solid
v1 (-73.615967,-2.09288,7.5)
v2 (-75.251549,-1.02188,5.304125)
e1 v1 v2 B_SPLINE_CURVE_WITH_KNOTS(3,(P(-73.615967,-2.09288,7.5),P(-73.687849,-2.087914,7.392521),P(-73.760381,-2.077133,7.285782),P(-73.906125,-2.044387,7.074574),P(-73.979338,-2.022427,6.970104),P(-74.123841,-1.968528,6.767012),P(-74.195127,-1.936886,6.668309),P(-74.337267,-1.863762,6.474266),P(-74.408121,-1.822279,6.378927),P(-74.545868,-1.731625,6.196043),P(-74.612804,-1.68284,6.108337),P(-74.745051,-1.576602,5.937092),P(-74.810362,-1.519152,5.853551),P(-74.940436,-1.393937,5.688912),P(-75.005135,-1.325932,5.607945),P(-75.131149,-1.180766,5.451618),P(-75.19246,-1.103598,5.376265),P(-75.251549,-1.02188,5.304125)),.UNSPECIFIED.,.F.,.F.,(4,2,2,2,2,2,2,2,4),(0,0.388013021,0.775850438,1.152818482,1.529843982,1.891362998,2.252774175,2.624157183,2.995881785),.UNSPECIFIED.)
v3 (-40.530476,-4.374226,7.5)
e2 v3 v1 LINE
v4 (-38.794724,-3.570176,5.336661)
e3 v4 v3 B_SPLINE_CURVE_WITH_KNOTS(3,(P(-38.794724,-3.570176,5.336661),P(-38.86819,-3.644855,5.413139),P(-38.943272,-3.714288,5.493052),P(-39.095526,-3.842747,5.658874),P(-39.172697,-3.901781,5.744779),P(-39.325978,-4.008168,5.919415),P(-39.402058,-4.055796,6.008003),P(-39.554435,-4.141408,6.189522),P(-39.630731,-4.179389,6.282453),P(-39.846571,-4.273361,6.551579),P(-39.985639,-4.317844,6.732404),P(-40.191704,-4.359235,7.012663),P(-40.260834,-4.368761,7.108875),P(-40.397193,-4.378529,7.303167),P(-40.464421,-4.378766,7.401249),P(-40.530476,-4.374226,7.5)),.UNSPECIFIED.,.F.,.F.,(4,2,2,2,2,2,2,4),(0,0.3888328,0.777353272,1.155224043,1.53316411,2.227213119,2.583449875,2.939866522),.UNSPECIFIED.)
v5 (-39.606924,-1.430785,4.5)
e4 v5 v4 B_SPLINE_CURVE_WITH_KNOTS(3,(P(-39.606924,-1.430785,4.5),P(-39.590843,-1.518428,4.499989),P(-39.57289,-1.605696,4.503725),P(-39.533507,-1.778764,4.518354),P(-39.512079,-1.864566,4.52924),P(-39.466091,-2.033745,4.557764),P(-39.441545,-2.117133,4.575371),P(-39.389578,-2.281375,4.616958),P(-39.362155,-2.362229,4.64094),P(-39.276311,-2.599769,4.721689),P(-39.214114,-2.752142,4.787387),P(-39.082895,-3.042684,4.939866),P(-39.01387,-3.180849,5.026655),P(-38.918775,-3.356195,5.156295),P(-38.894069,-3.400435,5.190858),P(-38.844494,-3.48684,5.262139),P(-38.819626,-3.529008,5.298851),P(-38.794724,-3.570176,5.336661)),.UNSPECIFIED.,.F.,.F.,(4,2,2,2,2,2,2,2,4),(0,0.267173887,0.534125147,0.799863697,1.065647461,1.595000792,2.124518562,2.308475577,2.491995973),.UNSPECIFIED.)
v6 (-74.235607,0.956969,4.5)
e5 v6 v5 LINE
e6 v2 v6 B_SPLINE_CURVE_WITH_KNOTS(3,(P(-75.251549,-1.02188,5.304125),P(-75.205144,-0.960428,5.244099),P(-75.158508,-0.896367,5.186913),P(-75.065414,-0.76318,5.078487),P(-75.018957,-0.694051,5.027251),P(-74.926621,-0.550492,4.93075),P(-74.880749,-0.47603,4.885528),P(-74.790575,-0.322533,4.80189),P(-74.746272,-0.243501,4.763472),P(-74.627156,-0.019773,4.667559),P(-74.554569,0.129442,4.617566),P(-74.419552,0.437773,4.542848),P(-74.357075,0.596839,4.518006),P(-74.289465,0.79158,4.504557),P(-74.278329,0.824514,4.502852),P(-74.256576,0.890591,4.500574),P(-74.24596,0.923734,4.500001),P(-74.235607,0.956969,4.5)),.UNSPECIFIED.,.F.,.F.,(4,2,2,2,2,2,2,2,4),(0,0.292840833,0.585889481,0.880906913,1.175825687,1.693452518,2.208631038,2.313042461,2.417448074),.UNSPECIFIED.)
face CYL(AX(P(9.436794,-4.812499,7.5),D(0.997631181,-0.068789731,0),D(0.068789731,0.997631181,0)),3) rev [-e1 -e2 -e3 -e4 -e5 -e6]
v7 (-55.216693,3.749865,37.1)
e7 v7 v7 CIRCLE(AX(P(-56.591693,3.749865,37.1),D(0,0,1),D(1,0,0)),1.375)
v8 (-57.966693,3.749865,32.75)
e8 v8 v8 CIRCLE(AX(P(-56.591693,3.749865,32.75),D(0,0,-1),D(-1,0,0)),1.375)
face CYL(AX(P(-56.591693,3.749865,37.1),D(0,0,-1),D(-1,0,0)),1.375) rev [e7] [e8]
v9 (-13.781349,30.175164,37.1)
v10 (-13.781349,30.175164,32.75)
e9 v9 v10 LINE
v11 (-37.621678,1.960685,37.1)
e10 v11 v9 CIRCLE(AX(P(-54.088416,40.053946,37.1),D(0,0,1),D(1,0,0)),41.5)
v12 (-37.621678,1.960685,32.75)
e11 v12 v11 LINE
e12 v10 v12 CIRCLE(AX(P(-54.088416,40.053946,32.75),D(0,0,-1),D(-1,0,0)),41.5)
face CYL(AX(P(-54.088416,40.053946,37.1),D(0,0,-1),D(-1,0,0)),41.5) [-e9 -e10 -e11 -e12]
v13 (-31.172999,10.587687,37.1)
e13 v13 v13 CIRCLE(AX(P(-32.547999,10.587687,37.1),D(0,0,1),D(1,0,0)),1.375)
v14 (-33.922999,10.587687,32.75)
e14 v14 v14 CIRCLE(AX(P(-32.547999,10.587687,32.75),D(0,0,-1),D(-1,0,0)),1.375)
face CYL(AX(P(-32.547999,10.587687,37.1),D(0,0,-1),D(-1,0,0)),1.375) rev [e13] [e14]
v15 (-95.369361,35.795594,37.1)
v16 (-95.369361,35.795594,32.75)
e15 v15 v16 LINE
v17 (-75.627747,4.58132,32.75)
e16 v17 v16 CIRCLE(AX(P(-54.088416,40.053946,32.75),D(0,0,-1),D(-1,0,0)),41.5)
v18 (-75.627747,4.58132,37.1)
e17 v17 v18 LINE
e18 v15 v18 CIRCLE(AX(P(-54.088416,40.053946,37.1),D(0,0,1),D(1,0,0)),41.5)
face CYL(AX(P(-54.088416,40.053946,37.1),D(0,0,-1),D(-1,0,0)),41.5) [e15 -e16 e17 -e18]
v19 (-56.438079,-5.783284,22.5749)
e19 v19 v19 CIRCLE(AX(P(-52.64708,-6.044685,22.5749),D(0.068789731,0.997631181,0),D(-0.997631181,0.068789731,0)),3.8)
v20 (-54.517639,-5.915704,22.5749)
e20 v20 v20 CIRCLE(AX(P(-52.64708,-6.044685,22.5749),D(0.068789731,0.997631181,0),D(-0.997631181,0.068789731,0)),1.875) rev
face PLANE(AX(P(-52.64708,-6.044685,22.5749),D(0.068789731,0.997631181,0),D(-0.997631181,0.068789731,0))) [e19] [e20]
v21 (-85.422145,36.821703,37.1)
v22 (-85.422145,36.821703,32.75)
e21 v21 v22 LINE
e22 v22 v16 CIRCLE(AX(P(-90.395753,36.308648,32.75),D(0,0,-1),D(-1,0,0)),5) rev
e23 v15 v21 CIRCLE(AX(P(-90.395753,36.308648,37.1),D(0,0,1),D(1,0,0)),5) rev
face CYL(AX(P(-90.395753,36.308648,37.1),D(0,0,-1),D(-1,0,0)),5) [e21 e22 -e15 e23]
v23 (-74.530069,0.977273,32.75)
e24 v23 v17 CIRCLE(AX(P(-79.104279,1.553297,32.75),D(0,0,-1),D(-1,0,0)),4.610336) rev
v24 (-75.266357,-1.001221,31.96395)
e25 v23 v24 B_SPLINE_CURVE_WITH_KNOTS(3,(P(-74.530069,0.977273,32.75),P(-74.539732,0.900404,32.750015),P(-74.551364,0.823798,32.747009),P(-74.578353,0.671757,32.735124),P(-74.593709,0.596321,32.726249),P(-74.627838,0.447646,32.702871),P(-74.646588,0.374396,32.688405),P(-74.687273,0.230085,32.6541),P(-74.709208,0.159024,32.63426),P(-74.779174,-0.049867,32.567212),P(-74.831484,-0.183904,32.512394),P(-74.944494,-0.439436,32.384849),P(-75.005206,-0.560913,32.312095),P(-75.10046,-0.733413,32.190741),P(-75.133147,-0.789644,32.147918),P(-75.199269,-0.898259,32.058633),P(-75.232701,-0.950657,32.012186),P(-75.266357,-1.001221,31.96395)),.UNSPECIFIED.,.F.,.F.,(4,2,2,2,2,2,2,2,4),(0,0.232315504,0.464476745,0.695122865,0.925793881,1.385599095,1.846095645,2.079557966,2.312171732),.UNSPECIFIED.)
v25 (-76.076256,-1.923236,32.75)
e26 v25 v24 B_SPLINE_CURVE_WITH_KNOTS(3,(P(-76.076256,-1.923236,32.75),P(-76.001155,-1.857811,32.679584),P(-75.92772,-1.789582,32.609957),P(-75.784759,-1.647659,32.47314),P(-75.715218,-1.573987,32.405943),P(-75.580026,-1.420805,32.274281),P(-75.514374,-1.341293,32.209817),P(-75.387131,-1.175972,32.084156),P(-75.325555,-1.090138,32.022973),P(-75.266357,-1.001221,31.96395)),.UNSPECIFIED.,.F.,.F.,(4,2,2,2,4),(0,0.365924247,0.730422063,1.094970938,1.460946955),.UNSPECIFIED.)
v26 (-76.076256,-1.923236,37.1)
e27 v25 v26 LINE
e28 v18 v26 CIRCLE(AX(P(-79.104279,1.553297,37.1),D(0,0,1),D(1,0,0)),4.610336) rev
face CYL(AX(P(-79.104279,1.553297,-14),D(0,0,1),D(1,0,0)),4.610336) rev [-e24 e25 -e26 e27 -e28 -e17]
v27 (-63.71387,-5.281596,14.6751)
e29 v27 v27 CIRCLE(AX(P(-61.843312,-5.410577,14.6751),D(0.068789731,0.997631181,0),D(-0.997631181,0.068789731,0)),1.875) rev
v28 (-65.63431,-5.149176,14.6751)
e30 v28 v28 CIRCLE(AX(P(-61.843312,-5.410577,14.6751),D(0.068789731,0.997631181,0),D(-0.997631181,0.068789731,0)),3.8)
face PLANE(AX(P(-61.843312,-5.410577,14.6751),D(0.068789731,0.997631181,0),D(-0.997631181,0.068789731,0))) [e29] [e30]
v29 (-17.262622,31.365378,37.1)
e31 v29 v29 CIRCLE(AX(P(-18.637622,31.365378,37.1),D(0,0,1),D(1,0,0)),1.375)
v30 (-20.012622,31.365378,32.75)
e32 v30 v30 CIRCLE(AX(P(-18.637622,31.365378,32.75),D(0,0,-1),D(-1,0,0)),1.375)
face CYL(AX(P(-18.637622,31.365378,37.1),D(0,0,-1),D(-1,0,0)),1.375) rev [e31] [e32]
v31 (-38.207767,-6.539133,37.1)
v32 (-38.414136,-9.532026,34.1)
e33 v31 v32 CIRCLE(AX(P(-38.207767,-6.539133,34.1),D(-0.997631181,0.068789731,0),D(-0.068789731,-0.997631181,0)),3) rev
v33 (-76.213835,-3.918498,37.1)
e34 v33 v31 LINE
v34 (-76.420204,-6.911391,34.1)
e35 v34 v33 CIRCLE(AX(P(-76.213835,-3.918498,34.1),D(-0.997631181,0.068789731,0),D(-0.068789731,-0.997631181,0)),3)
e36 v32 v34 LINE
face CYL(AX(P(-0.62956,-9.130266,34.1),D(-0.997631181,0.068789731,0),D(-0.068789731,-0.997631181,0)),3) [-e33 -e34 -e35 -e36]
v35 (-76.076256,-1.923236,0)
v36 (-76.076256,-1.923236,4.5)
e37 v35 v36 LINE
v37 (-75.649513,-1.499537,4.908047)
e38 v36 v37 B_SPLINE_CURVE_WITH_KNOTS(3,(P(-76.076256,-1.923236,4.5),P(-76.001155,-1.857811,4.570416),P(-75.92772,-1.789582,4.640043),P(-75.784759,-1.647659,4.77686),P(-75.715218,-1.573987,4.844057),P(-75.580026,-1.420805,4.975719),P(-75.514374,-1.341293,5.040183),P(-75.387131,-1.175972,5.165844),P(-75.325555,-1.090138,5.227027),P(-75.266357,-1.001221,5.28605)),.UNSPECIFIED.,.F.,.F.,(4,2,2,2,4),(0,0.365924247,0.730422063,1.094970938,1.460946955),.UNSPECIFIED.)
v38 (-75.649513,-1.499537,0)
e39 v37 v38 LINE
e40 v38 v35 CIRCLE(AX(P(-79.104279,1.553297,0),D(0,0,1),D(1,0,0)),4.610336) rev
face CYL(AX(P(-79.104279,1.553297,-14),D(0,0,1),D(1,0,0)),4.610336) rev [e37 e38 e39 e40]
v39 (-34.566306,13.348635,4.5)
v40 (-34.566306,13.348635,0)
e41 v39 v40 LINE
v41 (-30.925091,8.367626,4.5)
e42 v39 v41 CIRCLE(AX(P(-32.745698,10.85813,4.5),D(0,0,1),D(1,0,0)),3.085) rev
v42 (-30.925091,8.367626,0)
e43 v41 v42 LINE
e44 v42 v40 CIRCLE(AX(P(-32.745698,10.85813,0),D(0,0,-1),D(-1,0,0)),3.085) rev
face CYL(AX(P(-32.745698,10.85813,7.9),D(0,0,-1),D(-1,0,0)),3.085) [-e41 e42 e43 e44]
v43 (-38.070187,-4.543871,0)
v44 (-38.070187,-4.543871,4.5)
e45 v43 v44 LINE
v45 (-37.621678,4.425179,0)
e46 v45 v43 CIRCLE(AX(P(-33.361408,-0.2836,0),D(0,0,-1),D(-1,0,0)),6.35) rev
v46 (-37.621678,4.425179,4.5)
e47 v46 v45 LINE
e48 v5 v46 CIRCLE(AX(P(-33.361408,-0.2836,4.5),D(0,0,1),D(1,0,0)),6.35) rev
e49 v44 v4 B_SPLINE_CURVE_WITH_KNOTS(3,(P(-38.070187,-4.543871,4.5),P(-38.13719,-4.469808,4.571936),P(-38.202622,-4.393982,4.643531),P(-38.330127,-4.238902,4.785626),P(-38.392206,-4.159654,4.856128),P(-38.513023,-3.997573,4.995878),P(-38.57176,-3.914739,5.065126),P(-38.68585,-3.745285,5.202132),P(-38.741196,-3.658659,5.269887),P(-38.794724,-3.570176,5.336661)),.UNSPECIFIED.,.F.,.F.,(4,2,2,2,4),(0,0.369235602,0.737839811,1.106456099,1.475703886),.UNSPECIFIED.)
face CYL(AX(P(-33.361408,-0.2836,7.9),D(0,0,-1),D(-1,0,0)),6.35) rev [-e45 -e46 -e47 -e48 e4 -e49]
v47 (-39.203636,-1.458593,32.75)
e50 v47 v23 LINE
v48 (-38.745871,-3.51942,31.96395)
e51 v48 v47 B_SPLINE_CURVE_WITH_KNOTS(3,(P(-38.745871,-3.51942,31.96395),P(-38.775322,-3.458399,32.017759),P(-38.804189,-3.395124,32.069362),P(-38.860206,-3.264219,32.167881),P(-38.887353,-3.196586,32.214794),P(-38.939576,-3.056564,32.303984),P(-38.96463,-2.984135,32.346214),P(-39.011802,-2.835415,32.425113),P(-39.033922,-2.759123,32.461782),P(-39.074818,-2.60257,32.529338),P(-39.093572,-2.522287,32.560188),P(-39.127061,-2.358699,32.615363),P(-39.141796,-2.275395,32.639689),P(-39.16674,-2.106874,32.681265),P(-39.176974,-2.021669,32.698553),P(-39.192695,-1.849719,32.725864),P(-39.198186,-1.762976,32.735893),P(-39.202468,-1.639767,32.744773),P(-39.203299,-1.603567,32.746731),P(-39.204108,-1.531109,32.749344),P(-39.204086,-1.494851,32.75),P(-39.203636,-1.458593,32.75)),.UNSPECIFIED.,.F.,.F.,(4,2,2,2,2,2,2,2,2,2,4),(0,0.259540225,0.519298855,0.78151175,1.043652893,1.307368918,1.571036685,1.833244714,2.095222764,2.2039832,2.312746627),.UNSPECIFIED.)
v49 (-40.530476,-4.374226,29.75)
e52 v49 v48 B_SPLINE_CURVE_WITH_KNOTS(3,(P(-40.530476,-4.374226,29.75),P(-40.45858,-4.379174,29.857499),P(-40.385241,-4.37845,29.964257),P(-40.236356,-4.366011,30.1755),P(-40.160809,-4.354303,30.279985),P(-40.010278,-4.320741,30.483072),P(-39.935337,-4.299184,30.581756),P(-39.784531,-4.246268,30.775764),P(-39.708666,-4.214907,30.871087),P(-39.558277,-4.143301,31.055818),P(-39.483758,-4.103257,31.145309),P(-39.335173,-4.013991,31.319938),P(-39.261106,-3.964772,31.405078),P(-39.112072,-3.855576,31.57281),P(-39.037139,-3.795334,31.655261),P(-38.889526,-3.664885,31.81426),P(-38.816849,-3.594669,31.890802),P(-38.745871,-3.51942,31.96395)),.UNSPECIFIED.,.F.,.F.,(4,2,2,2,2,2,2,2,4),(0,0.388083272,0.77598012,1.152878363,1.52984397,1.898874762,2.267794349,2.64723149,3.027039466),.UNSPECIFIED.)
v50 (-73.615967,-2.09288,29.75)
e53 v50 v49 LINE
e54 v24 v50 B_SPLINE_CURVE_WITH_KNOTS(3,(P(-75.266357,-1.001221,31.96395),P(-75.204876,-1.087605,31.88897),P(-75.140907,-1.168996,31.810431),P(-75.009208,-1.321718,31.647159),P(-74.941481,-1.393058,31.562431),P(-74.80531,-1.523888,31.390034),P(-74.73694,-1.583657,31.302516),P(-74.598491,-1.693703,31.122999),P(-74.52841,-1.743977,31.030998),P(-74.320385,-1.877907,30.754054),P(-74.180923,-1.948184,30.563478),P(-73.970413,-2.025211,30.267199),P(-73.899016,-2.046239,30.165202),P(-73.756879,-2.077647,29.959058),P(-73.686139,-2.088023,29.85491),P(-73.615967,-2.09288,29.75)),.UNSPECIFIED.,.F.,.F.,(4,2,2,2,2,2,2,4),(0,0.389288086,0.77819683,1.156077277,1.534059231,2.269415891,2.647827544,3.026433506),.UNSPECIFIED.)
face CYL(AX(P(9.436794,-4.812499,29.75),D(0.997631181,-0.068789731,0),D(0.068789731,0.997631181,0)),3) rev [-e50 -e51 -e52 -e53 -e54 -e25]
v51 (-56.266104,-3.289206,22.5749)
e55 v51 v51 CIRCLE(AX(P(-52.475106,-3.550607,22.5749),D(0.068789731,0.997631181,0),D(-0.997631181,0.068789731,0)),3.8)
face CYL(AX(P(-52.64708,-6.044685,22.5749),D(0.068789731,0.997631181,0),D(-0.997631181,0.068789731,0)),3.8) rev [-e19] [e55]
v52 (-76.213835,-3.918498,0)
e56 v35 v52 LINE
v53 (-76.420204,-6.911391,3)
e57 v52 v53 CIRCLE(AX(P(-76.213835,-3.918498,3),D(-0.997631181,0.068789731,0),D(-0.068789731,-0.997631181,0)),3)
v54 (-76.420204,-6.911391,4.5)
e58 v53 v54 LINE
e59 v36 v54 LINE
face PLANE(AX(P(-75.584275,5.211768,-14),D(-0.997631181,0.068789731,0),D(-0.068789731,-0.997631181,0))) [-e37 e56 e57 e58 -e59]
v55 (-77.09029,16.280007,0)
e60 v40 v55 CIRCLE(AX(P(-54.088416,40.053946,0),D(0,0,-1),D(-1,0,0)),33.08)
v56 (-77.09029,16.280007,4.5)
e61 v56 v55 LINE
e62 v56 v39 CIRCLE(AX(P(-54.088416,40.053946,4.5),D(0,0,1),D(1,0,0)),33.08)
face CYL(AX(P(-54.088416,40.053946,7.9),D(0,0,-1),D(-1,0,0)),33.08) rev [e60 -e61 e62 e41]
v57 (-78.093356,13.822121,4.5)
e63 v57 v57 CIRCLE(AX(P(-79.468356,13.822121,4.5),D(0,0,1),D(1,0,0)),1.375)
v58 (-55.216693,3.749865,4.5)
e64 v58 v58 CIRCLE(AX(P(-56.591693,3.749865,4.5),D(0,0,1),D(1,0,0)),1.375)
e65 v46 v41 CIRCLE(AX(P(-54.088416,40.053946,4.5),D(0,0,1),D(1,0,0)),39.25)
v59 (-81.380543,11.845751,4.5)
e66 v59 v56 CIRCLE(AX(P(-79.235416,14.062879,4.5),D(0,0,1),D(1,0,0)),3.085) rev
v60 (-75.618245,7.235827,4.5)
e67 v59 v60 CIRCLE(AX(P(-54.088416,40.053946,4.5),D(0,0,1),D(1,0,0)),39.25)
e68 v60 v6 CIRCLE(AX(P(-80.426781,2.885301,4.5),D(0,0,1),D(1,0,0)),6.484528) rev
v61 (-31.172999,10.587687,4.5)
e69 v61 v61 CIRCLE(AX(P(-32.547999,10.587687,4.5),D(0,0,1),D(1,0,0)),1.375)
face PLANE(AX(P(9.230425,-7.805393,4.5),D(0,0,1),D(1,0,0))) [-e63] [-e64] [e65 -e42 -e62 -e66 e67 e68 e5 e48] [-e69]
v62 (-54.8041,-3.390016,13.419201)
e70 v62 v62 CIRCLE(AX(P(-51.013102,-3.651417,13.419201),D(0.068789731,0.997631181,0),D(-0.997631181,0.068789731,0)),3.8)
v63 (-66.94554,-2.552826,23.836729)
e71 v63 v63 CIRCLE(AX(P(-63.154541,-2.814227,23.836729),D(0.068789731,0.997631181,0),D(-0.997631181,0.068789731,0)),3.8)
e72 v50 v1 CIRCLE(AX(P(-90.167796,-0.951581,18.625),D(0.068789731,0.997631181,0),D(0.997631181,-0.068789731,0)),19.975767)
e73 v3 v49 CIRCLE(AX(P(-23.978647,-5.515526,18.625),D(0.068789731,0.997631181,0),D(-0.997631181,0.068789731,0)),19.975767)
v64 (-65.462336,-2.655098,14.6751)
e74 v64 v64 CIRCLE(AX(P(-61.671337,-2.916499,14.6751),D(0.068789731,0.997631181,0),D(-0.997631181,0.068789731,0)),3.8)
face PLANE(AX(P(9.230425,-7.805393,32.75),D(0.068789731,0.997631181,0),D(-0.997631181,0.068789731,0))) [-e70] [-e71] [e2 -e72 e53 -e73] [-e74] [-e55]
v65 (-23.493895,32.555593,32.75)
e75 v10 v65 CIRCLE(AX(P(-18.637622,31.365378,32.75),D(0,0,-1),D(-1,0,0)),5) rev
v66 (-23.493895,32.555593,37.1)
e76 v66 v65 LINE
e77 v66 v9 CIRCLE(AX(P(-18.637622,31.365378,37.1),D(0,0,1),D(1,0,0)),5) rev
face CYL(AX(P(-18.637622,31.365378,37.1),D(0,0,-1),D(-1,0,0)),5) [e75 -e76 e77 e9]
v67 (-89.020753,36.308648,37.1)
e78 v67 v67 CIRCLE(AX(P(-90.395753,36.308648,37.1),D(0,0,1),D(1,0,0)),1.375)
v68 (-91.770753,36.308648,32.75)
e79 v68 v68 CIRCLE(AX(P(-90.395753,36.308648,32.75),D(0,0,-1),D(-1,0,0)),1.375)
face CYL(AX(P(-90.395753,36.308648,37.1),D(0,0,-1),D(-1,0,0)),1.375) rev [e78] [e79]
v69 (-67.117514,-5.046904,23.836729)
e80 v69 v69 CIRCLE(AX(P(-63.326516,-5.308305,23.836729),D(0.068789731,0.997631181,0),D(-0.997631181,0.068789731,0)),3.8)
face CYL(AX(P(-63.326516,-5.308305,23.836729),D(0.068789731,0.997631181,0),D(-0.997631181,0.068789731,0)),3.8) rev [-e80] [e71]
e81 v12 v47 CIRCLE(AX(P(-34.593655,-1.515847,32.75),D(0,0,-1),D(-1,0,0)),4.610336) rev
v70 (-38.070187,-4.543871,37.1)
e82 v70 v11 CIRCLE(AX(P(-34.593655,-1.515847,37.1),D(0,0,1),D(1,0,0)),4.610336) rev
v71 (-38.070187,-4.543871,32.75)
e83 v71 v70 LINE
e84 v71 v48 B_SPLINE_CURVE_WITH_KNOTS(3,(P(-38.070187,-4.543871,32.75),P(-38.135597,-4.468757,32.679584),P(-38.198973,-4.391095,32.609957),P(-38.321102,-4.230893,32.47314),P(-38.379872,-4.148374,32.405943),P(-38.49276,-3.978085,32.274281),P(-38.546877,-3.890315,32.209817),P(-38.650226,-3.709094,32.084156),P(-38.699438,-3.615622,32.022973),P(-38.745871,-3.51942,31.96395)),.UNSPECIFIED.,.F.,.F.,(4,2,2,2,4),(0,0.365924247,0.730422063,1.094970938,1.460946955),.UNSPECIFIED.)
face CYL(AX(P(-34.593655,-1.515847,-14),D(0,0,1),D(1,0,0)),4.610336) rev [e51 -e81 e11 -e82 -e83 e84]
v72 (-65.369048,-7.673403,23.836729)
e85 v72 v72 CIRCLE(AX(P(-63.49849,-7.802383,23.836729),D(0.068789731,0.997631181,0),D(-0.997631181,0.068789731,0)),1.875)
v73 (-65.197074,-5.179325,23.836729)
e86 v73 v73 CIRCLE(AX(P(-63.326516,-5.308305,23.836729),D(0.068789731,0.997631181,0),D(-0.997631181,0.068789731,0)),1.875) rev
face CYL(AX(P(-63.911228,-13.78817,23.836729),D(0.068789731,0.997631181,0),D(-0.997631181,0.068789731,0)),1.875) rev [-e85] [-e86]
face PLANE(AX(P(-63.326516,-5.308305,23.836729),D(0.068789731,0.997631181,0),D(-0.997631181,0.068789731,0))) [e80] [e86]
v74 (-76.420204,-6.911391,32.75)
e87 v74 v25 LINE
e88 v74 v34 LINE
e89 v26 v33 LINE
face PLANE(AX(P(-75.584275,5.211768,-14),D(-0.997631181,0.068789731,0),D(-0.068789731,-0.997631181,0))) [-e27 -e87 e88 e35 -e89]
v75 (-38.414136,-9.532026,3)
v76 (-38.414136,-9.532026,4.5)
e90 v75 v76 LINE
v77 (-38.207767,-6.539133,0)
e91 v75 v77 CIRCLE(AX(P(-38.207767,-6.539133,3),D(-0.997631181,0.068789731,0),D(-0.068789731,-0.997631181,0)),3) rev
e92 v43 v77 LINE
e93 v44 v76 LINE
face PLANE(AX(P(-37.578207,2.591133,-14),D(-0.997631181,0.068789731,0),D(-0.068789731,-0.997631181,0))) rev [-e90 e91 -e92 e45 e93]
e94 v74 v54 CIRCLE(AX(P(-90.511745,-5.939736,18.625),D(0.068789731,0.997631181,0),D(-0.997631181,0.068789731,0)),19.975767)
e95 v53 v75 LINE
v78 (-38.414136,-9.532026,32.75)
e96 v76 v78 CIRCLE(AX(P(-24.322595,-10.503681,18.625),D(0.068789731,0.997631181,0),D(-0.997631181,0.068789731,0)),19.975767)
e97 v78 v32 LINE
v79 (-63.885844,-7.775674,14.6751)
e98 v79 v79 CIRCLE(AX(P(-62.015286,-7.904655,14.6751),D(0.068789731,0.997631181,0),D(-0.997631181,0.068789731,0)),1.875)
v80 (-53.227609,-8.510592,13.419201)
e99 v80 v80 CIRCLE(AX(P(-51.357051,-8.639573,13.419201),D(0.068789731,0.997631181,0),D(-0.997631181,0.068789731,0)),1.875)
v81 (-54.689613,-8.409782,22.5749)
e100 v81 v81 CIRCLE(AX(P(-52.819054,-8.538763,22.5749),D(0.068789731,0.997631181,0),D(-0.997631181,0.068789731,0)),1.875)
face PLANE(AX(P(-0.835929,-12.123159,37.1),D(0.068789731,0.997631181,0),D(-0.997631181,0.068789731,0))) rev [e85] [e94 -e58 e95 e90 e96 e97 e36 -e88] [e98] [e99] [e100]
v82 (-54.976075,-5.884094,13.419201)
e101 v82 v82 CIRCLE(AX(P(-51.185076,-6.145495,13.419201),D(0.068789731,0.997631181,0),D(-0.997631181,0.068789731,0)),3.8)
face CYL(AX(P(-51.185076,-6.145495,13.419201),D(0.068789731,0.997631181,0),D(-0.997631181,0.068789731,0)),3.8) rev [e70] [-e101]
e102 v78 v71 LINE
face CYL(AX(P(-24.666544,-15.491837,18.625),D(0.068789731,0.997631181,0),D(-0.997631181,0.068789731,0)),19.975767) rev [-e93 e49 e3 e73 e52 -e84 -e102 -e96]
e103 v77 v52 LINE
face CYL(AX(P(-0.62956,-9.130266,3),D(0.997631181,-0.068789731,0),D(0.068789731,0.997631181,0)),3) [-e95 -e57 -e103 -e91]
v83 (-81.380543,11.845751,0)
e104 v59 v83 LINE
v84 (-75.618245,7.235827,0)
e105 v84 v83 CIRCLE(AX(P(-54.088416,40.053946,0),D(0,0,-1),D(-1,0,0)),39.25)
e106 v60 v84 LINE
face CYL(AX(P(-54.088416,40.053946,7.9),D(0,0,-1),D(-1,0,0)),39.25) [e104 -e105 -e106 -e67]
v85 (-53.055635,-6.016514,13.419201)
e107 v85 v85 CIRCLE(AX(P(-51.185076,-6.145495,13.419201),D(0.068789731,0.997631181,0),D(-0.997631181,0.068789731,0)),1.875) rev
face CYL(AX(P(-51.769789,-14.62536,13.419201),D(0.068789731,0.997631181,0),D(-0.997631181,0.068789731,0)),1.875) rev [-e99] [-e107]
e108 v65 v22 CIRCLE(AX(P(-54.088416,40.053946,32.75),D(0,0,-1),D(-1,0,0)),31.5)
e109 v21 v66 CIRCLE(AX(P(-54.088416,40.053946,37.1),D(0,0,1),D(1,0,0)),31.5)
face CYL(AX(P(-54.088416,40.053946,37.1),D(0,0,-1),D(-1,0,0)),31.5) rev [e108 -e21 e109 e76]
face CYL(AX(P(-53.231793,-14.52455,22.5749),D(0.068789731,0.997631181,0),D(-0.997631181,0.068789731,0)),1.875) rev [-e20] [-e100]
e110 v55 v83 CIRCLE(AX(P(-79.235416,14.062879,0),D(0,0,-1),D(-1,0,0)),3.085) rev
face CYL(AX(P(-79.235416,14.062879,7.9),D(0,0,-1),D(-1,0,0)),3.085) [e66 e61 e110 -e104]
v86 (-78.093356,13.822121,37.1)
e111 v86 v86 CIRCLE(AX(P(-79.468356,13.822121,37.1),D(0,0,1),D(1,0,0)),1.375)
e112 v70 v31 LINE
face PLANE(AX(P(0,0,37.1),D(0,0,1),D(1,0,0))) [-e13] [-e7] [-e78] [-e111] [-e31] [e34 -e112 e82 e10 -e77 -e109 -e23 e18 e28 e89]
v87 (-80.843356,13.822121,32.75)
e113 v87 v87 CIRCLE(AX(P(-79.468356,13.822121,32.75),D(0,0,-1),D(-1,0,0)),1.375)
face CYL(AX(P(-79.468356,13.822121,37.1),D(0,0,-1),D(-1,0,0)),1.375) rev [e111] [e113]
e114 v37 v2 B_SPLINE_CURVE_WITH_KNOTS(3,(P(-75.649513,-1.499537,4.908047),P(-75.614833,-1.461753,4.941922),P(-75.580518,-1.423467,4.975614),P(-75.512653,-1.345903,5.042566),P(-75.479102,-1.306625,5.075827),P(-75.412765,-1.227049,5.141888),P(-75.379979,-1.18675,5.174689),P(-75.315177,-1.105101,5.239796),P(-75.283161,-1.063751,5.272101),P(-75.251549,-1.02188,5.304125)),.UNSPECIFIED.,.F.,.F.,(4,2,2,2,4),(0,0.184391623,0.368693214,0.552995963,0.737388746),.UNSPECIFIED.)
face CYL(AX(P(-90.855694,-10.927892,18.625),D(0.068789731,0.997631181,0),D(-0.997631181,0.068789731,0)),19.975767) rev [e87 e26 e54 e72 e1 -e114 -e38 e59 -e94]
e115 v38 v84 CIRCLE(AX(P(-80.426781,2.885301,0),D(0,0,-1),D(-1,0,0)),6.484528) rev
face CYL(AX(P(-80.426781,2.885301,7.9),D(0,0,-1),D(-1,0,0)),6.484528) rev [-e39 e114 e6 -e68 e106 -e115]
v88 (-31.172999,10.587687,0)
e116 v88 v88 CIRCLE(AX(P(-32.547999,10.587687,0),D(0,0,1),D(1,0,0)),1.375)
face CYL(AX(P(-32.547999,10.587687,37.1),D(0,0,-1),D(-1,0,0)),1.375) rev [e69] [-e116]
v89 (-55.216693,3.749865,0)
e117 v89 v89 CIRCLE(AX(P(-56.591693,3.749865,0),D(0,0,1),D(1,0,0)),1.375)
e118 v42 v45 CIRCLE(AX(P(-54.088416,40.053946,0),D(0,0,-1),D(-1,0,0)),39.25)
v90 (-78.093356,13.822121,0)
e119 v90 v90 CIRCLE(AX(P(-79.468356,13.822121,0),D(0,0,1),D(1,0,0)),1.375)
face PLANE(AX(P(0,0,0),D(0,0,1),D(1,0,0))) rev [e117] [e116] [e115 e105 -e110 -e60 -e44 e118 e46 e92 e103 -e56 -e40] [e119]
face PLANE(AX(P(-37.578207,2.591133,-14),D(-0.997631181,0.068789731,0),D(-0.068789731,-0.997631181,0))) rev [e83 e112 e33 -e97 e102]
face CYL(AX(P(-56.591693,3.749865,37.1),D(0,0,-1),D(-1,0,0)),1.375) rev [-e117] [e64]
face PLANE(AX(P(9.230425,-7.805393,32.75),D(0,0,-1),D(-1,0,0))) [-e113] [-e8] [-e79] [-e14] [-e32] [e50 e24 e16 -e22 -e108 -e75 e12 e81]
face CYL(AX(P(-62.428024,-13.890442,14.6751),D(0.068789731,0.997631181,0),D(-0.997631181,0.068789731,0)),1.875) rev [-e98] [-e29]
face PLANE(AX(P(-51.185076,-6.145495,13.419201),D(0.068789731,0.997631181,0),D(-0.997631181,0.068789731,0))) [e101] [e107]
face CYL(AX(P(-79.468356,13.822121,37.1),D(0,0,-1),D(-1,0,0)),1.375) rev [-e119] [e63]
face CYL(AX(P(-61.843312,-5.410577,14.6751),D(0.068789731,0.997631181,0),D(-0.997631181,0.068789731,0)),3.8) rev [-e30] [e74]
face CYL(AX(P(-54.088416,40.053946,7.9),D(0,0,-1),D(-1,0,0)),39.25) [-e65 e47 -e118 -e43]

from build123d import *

# Parameters (mm, degrees)
EXTRUDE_2_DEPTH          = 37.1
SKETCH_2_R               = 1.375
CUT_EXTRUDE_2_DEPTH      = 37.1
CUT_EXTRUDE_3_DEPTH      = 43
CUT_EXTRUDE_3_DEPTH_BACK = 66.1
SKETCH_7_W               = 28.25
SKETCH_7_H               = 55.645233233
CUT_EXTRUDE_4_DEPTH      = 20.1
CUT_EXTRUDE_START        = -51.1
CUT_EXTRUDE_5_DEPTH      = 51.1
SKETCH_11_R              = 1.875
CUT_EXTRUDE_11_DEPTH     = 11
SKETCH_14_R              = 3.8
CUT_EXTRUDE_12_DEPTH     = 2.5
CUT_EXTRUDE_13_DEPTH     = 10
CUT_EXTRUDE_START_2      = -4.5
CUT_EXTRUDE_16_DEPTH     = 4.5
FILLET_1_R               = 3
FILLET_2_R               = 3
FILLET_3_R               = 3
FILLET_4_R               = 3


# Read off the part's stored shape, not the designer's step: 切除-拉伸16
with BuildPart() as part:
    # 草图1 → 凸台-拉伸2 (new body)
    with BuildSketch(Plane.XY):
        with BuildLine():
            Line((-79.849997265, 7.517951971), (-80.824006782, -6.607735752))
            Line((-80.824006782, -6.607735752), (-34.011664697, -9.835590396))
            Line((-34.011664697, -9.835590396), (-33.037718089, 4.289184974))
            ThreePointArc((-33.037718089, 4.289184974), (-31.289416401, 5.37750396), (-29.597256671, 6.551212806))
            ThreePointArc((-29.597256671, 6.551212806), (-28.511524827, 13.53842873), (-35.49874075, 14.624160574))
            ThreePointArc((-35.49874075, 14.624160574), (-56.254713351, 8.628523944), (-75.991651506, 17.415521695))
            ThreePointArc((-75.991651506, 17.415521695), (-83.061756308, 17.298825117), (-82.94505973, 10.228720316))
            ThreePointArc((-82.94505973, 10.228720316), (-81.431142485, 8.834956844), (-79.849997265, 7.517951971))
        make_face()
        with BuildLine():
            ThreePointArc((-35.49874075, 14.624160574), (-28.511524827, 13.53842873), (-29.597256671, 6.551212806))
            ThreePointArc((-29.597256671, 6.551212806), (-19.60326972, 16.966618055), (-13.781348513, 30.175163589))
            ThreePointArc((-13.781348513, 30.175163589), (-17.447406903, 36.221651485), (-23.493894799, 32.555593096))
            ThreePointArc((-23.493894799, 32.555593096), (-27.912943426, 22.529829618), (-35.49874075, 14.624160574))
        make_face()
        with BuildLine():
            ThreePointArc((-95.369360777, 35.795593613), (-91.41450046, 21.915219816), (-82.94505973, 10.228720316))
            ThreePointArc((-82.94505973, 10.228720316), (-83.061756308, 17.298825117), (-75.991651506, 17.415521695))
            ThreePointArc((-75.991651506, 17.415521695), (-82.420263145, 26.28599722), (-85.422145072, 36.821702632))
            ThreePointArc((-85.422145072, 36.821702632), (-90.908807434, 41.282255975), (-95.369360777, 35.795593613))
        make_face()
    extrude(amount=EXTRUDE_2_DEPTH)

    # 草图2 → 切除-拉伸2 (cut)
    with BuildSketch(Plane.XY):
        with Locations((-90.395752924, 36.308648122)):
            Circle(SKETCH_2_R)
        with Locations((-79.468355618, 13.822121005)):
            Circle(SKETCH_2_R)
        with Locations((-56.591693385, 3.749865202)):
            Circle(SKETCH_2_R)
        with Locations((-32.547998711, 10.58768669)):
            Circle(SKETCH_2_R)
        with Locations((-18.637621656, 31.365378342)):
            Circle(SKETCH_2_R)
    extrude(amount=CUT_EXTRUDE_2_DEPTH, mode=Mode.SUBTRACT)

    # 草图7 → 切除-拉伸3 (cut, two sides: drawn at the far end of the back side and taken through both)
    with BuildSketch(Plane(origin=(-33.175735668, 2.287568784, 0), x_dir=(0, 0, -1), z_dir=(0.9976311807721483, -0.0687897314369622, 0)).offset(-CUT_EXTRUDE_3_DEPTH_BACK)):
        with Locations((-18.625, 20.670671677)):
            Rectangle(SKETCH_7_W, SKETCH_7_H)
    extrude(amount=CUT_EXTRUDE_3_DEPTH + CUT_EXTRUDE_3_DEPTH_BACK, mode=Mode.SUBTRACT)

    # 草图8 → 切除-拉伸4 (cut)
    with BuildSketch(Plane(origin=(0, 0, 0), x_dir=(-1, 0, 0), z_dir=(0, 0, -1))):
        with BuildLine():
            ThreePointArc((82.94505973, 10.228720316), (51.234404279, 81.455692616), (29.597256671, 6.551212806))
            ThreePointArc((29.597256671, 6.551212806), (28.511524827, 13.53842873), (35.49874075, 14.624160574))
            ThreePointArc((35.49874075, 14.624160574), (51.922117851, 71.47936814), (75.991651506, 17.415521695))
            ThreePointArc((75.991651506, 17.415521695), (83.061756308, 17.298825117), (82.94505973, 10.228720316))
        make_face()
    extrude(amount=-CUT_EXTRUDE_4_DEPTH, mode=Mode.SUBTRACT)

    # 草图9 → 切除-拉伸5 (cut)
    with BuildSketch(Plane.XY.offset(37.1).offset(CUT_EXTRUDE_START)):
        with BuildLine():
            Line((-80.824006782, -6.607735752), (-76.420204424, -6.911391439))
            Line((-76.420204424, -6.911391439), (-76.076255766, -1.923235535))
            ThreePointArc((-76.076255766, -1.923235535), (-74.504863731, 1.236152849), (-75.627746717, 4.581319764))
            ThreePointArc((-75.627746717, 4.581319764), (-77.78440766, 5.984165292), (-79.849997265, 7.517951971))
            Line((-79.849997265, 7.517951971), (-80.824006782, -6.607735752))
        make_face()
        with BuildLine():
            Line((-38.070187243, -4.543870592), (-38.4141359, -9.532026496))
            Line((-38.4141359, -9.532026496), (-34.011664697, -9.835590396))
            Line((-34.011664697, -9.835590396), (-33.037718089, 4.289184974))
            ThreePointArc((-33.037718089, 4.289184974), (-35.293603575, 3.053877922), (-37.621678194, 1.960684706))
            ThreePointArc((-37.621678194, 1.960684706), (-39.193070229, -1.198703677), (-38.070187243, -4.543870592))
        make_face()
    extrude(amount=CUT_EXTRUDE_5_DEPTH, mode=Mode.SUBTRACT)

    # 草图11 → 切除-拉伸11 (cut)
    with BuildSketch(Plane(origin=(-0.491980372, -7.135003276, 0), x_dir=(0.9976311807721483, -0.06878973143696221, 0), z_dir=(0.06878973143696221, 0.9976311807721483, 0))):
        with Locations(Location((-61.324623812, -14.675100208, 0), (0, 0, 180))):
            Circle(SKETCH_11_R)
        with Locations(Location((-62.811349691, -23.836728616, 0), (0, 0, 180))):
            Circle(SKETCH_11_R)
        with Locations(Location((-50.64108112, -13.419201263, 0), (0, 0, 180))):
            Circle(SKETCH_11_R)
        with Locations(Location((-52.106556415, -22.574899792, 0), (0, 0, 180))):
            Circle(SKETCH_11_R)
    extrude(amount=-CUT_EXTRUDE_11_DEPTH, mode=Mode.SUBTRACT)

    # 草图14 → 切除-拉伸12 (cut)
    with BuildSketch(Plane(origin=(-0.491980372, -7.135003276, 0), x_dir=(0.9976311807721483, -0.06878973143696221, 0), z_dir=(0.06878973143696221, 0.9976311807721483, 0))):
        with Locations(Location((-61.324623812, -14.675100208, 0), (0, 0, 180))):
            Circle(SKETCH_14_R)
        with Locations(Location((-50.64108112, -13.419201263, 0), (0, 0, 180))):
            Circle(SKETCH_14_R)
        with Locations(Location((-52.106556415, -22.574899792, 0), (0, 0, 180))):
            Circle(SKETCH_14_R)
        with Locations(Location((-62.811349691, -23.836728616, 0), (0, 0, 180))):
            Circle(SKETCH_14_R)
    extrude(amount=-CUT_EXTRUDE_12_DEPTH, mode=Mode.SUBTRACT)

    # 草图15 → 切除-拉伸13 (cut)
    with BuildSketch(Plane(origin=(-0.491980372, -7.135003276, 0), x_dir=(0.9976311807721483, -0.06878973143696221, 0), z_dir=(0.06878973143696221, 0.9976311807721483, 0))):
        with BuildLine():
            Line((-75.763746013, -4.5), (-75.763746013, -32.75))
            ThreePointArc((-75.763746013, -32.75), (-69.912979444, -18.625), (-75.763746013, -4.5))
        make_face()
        with BuildLine():
            Line((-37.667434214, -4.5), (-37.667434214, -32.75))
            ThreePointArc((-37.667434214, -32.75), (-43.518200782, -18.625), (-37.667434214, -4.5))
        make_face()
    extrude(amount=-CUT_EXTRUDE_13_DEPTH, mode=Mode.SUBTRACT)

    # 切除-拉伸16 outline → 切除-拉伸16 (cut)
    with BuildSketch(Plane(origin=(0, 0, 0), x_dir=(-1, 0, 0), z_dir=(0, 0, -1)).offset(CUT_EXTRUDE_START_2)):
        with BuildLine():
            ThreePointArc((81.380542879, 11.845750626), (78.607973299, 9.405066939), (75.61824487, 7.235826783))
            ThreePointArc((75.61824487, 7.235826783), (73.942295414, 2.862089757), (75.649513236, -1.499537171))
            ThreePointArc((75.649513236, -1.499537171), (74.493972214, 1.536793977), (75.627746717, 4.581319764))
            ThreePointArc((75.627746717, 4.581319764), (79.444122325, 7.200664067), (82.94505973, 10.228720316))
            ThreePointArc((82.94505973, 10.228720316), (83.061756308, 17.298825118), (75.991651506, 17.415521695))
            ThreePointArc((75.991651506, 17.415521695), (56.254713351, 8.628523944), (35.49874075, 14.624160574))
            ThreePointArc((35.49874075, 14.624160574), (28.511524827, 13.538428729), (29.597256671, 6.551212806))
            ThreePointArc((29.597256671, 6.551212806), (33.481243181, 4.031807781), (37.621678194, 1.960684706))
            ThreePointArc((37.621678194, 1.960684706), (39.193070229, -1.198703678), (38.070187243, -4.543870592))
            ThreePointArc((38.070187243, -4.543870592), (39.703483657, 0.033543341), (37.621678194, 4.425178744))
            ThreePointArc((37.621678194, 4.425178744), (34.175575911, 6.230266238), (30.925090589, 8.367626054))
            ThreePointArc((30.925090589, 8.367626054), (30.255194041, 12.678738279), (34.566306266, 13.348634827))
            ThreePointArc((34.566306266, 13.348634827), (56.363372095, 7.052264676), (77.090290005, 16.280007077))
            ThreePointArc((77.090290005, 16.280007077), (81.452544668, 16.208005289), (81.380542879, 11.845750626))
        make_face()
    extrude(amount=CUT_EXTRUDE_16_DEPTH, mode=Mode.SUBTRACT)

    # 圆角1
    # the kernel refuses this fillet: 3 mm, written as the material it adds along each edge
    with BuildSketch(Plane(origin=(-83.558489622, -1.407312549, 32.75), x_dir=(0, 0, -1), z_dir=(0.9976311807721482, -0.06878973143696218, 0))) as fillet_1_piece_1_section:
        with BuildLine():
            CenterArc((FILLET_1_R, FILLET_1_R), FILLET_1_R, 180, 90)
            Line((0, FILLET_1_R), (0, 0))
            Line((0, 0), (FILLET_1_R, 0))
        make_face()
    fillet_1_piece_1 = extrude(amount=53.096311799, mode=Mode.PRIVATE)
    fillet_1_piece_1 = fillet_1_piece_1 - Plane(origin=(-90.121131909, -0.274826283, 18.625), x_dir=(0.7054317730471289, -0.04864168557507743, 0.707106781186547), z_dir=(0.06878973143696221, 0.9976311807721483, 0)) * Cylinder(19.975766569, 119, mode=Mode.PRIVATE)
    fillet_1_piece_1 = fillet_1_piece_1 - Plane(origin=(-23.931982529, -4.838771253, 18.625), x_dir=(-0.7054317730471323, 0.04864168557507767, 0.7071067811865438), z_dir=(0.06878973143696221, 0.9976311807721483, 0)) * Cylinder(19.975766569, 119, mode=Mode.PRIVATE)
    fillet_1_piece_1 = fillet_1_piece_1 - Plane(origin=(-79.104278891, 1.553296639, 32.082260552), x_dir=(0.6567900874720489, -0.7540734586222076, 0), z_dir=(0, 0, -1)) * Cylinder(4.610336213, 119, mode=Mode.PRIVATE)
    fillet_1_piece_1 = fillet_1_piece_1 - Plane(origin=(-34.593655069, -1.515847467, 32.082260552), x_dir=(-0.6567900874720498, 0.754073458622207, 0), z_dir=(0, 0, -1)) * Cylinder(4.610336213, 119, mode=Mode.PRIVATE)
    add(fillet_1_piece_1)

    # 圆角2
    # the kernel refuses this fillet: 3 mm, written as the material it adds along each edge
    with BuildSketch(Plane(origin=(-83.558489622, -1.407312549, 4.5), x_dir=(0, 0, 1), z_dir=(0.9976311807721482, -0.06878973143696218, 0))) as fillet_2_piece_1_section:
        with BuildLine():
            CenterArc((FILLET_2_R, -FILLET_2_R), FILLET_2_R, 90, 90)
            Line((0, -FILLET_2_R), (0, 0))
            Line((0, 0), (FILLET_2_R, 0))
        make_face()
    fillet_2_piece_1 = extrude(amount=53.096311799, mode=Mode.PRIVATE)
    fillet_2_piece_1 = fillet_2_piece_1 - Plane(origin=(-90.121862606, -0.285423301, 18.625), x_dir=(0.7054317730468341, -0.048641685575091055, 0.7071067811868403), z_dir=(0.06878973143700999, 0.997631180772145, 0)) * Cylinder(19.975766569, 119, mode=Mode.PRIVATE)
    fillet_2_piece_1 = fillet_2_piece_1 - Plane(origin=(-23.932713226, -4.849368272, 18.625), x_dir=(-0.7054317730468341, 0.048641685575091055, 0.7071067811868403), z_dir=(0.06878973143700999, 0.997631180772145, 0)) * Cylinder(19.975766569, 119, mode=Mode.PRIVATE)
    fillet_2_piece_1 = fillet_2_piece_1 - Plane(origin=(-33.361408051, -0.283600448, 5.162419383), x_dir=(-0.74154000103131, -0.670908657620756, 0), z_dir=(0, 0, 1)) * Cylinder(6.35000025, 119, mode=Mode.PRIVATE)
    fillet_2_piece_1 = fillet_2_piece_1 - Plane(origin=(-80.426781476, 2.885301072, 5.162419383), x_dir=(0.7415400009547184, 0.670908657705411, 0), z_dir=(0, 0, 1)) * Cylinder(6.484527605, 119, mode=Mode.PRIVATE)
    fillet_2_piece_1 = fillet_2_piece_1 - Plane(origin=(-79.104278891, 1.553296639, 5.162419383), x_dir=(0.6567900874720489, -0.7540734586222076, 0), z_dir=(0, 0, -1)) * Cylinder(4.610336213, 119, mode=Mode.PRIVATE)
    add(fillet_2_piece_1)

    # 圆角3
    fillet_3_edges = [part.edges().sort_by_distance(p)[0] for p in [
        (-57.417170162, -8.221708967, 37.1),
    ]]
    fillet(fillet_3_edges, radius=FILLET_3_R)

    # 圆角4
    fillet_4_edges = [part.edges().sort_by_distance(p)[0] for p in [
        (-57.417170162, -8.221708967, 0),
    ]]
    fillet(fillet_4_edges, radius=FILLET_4_R)


solid = part.part
